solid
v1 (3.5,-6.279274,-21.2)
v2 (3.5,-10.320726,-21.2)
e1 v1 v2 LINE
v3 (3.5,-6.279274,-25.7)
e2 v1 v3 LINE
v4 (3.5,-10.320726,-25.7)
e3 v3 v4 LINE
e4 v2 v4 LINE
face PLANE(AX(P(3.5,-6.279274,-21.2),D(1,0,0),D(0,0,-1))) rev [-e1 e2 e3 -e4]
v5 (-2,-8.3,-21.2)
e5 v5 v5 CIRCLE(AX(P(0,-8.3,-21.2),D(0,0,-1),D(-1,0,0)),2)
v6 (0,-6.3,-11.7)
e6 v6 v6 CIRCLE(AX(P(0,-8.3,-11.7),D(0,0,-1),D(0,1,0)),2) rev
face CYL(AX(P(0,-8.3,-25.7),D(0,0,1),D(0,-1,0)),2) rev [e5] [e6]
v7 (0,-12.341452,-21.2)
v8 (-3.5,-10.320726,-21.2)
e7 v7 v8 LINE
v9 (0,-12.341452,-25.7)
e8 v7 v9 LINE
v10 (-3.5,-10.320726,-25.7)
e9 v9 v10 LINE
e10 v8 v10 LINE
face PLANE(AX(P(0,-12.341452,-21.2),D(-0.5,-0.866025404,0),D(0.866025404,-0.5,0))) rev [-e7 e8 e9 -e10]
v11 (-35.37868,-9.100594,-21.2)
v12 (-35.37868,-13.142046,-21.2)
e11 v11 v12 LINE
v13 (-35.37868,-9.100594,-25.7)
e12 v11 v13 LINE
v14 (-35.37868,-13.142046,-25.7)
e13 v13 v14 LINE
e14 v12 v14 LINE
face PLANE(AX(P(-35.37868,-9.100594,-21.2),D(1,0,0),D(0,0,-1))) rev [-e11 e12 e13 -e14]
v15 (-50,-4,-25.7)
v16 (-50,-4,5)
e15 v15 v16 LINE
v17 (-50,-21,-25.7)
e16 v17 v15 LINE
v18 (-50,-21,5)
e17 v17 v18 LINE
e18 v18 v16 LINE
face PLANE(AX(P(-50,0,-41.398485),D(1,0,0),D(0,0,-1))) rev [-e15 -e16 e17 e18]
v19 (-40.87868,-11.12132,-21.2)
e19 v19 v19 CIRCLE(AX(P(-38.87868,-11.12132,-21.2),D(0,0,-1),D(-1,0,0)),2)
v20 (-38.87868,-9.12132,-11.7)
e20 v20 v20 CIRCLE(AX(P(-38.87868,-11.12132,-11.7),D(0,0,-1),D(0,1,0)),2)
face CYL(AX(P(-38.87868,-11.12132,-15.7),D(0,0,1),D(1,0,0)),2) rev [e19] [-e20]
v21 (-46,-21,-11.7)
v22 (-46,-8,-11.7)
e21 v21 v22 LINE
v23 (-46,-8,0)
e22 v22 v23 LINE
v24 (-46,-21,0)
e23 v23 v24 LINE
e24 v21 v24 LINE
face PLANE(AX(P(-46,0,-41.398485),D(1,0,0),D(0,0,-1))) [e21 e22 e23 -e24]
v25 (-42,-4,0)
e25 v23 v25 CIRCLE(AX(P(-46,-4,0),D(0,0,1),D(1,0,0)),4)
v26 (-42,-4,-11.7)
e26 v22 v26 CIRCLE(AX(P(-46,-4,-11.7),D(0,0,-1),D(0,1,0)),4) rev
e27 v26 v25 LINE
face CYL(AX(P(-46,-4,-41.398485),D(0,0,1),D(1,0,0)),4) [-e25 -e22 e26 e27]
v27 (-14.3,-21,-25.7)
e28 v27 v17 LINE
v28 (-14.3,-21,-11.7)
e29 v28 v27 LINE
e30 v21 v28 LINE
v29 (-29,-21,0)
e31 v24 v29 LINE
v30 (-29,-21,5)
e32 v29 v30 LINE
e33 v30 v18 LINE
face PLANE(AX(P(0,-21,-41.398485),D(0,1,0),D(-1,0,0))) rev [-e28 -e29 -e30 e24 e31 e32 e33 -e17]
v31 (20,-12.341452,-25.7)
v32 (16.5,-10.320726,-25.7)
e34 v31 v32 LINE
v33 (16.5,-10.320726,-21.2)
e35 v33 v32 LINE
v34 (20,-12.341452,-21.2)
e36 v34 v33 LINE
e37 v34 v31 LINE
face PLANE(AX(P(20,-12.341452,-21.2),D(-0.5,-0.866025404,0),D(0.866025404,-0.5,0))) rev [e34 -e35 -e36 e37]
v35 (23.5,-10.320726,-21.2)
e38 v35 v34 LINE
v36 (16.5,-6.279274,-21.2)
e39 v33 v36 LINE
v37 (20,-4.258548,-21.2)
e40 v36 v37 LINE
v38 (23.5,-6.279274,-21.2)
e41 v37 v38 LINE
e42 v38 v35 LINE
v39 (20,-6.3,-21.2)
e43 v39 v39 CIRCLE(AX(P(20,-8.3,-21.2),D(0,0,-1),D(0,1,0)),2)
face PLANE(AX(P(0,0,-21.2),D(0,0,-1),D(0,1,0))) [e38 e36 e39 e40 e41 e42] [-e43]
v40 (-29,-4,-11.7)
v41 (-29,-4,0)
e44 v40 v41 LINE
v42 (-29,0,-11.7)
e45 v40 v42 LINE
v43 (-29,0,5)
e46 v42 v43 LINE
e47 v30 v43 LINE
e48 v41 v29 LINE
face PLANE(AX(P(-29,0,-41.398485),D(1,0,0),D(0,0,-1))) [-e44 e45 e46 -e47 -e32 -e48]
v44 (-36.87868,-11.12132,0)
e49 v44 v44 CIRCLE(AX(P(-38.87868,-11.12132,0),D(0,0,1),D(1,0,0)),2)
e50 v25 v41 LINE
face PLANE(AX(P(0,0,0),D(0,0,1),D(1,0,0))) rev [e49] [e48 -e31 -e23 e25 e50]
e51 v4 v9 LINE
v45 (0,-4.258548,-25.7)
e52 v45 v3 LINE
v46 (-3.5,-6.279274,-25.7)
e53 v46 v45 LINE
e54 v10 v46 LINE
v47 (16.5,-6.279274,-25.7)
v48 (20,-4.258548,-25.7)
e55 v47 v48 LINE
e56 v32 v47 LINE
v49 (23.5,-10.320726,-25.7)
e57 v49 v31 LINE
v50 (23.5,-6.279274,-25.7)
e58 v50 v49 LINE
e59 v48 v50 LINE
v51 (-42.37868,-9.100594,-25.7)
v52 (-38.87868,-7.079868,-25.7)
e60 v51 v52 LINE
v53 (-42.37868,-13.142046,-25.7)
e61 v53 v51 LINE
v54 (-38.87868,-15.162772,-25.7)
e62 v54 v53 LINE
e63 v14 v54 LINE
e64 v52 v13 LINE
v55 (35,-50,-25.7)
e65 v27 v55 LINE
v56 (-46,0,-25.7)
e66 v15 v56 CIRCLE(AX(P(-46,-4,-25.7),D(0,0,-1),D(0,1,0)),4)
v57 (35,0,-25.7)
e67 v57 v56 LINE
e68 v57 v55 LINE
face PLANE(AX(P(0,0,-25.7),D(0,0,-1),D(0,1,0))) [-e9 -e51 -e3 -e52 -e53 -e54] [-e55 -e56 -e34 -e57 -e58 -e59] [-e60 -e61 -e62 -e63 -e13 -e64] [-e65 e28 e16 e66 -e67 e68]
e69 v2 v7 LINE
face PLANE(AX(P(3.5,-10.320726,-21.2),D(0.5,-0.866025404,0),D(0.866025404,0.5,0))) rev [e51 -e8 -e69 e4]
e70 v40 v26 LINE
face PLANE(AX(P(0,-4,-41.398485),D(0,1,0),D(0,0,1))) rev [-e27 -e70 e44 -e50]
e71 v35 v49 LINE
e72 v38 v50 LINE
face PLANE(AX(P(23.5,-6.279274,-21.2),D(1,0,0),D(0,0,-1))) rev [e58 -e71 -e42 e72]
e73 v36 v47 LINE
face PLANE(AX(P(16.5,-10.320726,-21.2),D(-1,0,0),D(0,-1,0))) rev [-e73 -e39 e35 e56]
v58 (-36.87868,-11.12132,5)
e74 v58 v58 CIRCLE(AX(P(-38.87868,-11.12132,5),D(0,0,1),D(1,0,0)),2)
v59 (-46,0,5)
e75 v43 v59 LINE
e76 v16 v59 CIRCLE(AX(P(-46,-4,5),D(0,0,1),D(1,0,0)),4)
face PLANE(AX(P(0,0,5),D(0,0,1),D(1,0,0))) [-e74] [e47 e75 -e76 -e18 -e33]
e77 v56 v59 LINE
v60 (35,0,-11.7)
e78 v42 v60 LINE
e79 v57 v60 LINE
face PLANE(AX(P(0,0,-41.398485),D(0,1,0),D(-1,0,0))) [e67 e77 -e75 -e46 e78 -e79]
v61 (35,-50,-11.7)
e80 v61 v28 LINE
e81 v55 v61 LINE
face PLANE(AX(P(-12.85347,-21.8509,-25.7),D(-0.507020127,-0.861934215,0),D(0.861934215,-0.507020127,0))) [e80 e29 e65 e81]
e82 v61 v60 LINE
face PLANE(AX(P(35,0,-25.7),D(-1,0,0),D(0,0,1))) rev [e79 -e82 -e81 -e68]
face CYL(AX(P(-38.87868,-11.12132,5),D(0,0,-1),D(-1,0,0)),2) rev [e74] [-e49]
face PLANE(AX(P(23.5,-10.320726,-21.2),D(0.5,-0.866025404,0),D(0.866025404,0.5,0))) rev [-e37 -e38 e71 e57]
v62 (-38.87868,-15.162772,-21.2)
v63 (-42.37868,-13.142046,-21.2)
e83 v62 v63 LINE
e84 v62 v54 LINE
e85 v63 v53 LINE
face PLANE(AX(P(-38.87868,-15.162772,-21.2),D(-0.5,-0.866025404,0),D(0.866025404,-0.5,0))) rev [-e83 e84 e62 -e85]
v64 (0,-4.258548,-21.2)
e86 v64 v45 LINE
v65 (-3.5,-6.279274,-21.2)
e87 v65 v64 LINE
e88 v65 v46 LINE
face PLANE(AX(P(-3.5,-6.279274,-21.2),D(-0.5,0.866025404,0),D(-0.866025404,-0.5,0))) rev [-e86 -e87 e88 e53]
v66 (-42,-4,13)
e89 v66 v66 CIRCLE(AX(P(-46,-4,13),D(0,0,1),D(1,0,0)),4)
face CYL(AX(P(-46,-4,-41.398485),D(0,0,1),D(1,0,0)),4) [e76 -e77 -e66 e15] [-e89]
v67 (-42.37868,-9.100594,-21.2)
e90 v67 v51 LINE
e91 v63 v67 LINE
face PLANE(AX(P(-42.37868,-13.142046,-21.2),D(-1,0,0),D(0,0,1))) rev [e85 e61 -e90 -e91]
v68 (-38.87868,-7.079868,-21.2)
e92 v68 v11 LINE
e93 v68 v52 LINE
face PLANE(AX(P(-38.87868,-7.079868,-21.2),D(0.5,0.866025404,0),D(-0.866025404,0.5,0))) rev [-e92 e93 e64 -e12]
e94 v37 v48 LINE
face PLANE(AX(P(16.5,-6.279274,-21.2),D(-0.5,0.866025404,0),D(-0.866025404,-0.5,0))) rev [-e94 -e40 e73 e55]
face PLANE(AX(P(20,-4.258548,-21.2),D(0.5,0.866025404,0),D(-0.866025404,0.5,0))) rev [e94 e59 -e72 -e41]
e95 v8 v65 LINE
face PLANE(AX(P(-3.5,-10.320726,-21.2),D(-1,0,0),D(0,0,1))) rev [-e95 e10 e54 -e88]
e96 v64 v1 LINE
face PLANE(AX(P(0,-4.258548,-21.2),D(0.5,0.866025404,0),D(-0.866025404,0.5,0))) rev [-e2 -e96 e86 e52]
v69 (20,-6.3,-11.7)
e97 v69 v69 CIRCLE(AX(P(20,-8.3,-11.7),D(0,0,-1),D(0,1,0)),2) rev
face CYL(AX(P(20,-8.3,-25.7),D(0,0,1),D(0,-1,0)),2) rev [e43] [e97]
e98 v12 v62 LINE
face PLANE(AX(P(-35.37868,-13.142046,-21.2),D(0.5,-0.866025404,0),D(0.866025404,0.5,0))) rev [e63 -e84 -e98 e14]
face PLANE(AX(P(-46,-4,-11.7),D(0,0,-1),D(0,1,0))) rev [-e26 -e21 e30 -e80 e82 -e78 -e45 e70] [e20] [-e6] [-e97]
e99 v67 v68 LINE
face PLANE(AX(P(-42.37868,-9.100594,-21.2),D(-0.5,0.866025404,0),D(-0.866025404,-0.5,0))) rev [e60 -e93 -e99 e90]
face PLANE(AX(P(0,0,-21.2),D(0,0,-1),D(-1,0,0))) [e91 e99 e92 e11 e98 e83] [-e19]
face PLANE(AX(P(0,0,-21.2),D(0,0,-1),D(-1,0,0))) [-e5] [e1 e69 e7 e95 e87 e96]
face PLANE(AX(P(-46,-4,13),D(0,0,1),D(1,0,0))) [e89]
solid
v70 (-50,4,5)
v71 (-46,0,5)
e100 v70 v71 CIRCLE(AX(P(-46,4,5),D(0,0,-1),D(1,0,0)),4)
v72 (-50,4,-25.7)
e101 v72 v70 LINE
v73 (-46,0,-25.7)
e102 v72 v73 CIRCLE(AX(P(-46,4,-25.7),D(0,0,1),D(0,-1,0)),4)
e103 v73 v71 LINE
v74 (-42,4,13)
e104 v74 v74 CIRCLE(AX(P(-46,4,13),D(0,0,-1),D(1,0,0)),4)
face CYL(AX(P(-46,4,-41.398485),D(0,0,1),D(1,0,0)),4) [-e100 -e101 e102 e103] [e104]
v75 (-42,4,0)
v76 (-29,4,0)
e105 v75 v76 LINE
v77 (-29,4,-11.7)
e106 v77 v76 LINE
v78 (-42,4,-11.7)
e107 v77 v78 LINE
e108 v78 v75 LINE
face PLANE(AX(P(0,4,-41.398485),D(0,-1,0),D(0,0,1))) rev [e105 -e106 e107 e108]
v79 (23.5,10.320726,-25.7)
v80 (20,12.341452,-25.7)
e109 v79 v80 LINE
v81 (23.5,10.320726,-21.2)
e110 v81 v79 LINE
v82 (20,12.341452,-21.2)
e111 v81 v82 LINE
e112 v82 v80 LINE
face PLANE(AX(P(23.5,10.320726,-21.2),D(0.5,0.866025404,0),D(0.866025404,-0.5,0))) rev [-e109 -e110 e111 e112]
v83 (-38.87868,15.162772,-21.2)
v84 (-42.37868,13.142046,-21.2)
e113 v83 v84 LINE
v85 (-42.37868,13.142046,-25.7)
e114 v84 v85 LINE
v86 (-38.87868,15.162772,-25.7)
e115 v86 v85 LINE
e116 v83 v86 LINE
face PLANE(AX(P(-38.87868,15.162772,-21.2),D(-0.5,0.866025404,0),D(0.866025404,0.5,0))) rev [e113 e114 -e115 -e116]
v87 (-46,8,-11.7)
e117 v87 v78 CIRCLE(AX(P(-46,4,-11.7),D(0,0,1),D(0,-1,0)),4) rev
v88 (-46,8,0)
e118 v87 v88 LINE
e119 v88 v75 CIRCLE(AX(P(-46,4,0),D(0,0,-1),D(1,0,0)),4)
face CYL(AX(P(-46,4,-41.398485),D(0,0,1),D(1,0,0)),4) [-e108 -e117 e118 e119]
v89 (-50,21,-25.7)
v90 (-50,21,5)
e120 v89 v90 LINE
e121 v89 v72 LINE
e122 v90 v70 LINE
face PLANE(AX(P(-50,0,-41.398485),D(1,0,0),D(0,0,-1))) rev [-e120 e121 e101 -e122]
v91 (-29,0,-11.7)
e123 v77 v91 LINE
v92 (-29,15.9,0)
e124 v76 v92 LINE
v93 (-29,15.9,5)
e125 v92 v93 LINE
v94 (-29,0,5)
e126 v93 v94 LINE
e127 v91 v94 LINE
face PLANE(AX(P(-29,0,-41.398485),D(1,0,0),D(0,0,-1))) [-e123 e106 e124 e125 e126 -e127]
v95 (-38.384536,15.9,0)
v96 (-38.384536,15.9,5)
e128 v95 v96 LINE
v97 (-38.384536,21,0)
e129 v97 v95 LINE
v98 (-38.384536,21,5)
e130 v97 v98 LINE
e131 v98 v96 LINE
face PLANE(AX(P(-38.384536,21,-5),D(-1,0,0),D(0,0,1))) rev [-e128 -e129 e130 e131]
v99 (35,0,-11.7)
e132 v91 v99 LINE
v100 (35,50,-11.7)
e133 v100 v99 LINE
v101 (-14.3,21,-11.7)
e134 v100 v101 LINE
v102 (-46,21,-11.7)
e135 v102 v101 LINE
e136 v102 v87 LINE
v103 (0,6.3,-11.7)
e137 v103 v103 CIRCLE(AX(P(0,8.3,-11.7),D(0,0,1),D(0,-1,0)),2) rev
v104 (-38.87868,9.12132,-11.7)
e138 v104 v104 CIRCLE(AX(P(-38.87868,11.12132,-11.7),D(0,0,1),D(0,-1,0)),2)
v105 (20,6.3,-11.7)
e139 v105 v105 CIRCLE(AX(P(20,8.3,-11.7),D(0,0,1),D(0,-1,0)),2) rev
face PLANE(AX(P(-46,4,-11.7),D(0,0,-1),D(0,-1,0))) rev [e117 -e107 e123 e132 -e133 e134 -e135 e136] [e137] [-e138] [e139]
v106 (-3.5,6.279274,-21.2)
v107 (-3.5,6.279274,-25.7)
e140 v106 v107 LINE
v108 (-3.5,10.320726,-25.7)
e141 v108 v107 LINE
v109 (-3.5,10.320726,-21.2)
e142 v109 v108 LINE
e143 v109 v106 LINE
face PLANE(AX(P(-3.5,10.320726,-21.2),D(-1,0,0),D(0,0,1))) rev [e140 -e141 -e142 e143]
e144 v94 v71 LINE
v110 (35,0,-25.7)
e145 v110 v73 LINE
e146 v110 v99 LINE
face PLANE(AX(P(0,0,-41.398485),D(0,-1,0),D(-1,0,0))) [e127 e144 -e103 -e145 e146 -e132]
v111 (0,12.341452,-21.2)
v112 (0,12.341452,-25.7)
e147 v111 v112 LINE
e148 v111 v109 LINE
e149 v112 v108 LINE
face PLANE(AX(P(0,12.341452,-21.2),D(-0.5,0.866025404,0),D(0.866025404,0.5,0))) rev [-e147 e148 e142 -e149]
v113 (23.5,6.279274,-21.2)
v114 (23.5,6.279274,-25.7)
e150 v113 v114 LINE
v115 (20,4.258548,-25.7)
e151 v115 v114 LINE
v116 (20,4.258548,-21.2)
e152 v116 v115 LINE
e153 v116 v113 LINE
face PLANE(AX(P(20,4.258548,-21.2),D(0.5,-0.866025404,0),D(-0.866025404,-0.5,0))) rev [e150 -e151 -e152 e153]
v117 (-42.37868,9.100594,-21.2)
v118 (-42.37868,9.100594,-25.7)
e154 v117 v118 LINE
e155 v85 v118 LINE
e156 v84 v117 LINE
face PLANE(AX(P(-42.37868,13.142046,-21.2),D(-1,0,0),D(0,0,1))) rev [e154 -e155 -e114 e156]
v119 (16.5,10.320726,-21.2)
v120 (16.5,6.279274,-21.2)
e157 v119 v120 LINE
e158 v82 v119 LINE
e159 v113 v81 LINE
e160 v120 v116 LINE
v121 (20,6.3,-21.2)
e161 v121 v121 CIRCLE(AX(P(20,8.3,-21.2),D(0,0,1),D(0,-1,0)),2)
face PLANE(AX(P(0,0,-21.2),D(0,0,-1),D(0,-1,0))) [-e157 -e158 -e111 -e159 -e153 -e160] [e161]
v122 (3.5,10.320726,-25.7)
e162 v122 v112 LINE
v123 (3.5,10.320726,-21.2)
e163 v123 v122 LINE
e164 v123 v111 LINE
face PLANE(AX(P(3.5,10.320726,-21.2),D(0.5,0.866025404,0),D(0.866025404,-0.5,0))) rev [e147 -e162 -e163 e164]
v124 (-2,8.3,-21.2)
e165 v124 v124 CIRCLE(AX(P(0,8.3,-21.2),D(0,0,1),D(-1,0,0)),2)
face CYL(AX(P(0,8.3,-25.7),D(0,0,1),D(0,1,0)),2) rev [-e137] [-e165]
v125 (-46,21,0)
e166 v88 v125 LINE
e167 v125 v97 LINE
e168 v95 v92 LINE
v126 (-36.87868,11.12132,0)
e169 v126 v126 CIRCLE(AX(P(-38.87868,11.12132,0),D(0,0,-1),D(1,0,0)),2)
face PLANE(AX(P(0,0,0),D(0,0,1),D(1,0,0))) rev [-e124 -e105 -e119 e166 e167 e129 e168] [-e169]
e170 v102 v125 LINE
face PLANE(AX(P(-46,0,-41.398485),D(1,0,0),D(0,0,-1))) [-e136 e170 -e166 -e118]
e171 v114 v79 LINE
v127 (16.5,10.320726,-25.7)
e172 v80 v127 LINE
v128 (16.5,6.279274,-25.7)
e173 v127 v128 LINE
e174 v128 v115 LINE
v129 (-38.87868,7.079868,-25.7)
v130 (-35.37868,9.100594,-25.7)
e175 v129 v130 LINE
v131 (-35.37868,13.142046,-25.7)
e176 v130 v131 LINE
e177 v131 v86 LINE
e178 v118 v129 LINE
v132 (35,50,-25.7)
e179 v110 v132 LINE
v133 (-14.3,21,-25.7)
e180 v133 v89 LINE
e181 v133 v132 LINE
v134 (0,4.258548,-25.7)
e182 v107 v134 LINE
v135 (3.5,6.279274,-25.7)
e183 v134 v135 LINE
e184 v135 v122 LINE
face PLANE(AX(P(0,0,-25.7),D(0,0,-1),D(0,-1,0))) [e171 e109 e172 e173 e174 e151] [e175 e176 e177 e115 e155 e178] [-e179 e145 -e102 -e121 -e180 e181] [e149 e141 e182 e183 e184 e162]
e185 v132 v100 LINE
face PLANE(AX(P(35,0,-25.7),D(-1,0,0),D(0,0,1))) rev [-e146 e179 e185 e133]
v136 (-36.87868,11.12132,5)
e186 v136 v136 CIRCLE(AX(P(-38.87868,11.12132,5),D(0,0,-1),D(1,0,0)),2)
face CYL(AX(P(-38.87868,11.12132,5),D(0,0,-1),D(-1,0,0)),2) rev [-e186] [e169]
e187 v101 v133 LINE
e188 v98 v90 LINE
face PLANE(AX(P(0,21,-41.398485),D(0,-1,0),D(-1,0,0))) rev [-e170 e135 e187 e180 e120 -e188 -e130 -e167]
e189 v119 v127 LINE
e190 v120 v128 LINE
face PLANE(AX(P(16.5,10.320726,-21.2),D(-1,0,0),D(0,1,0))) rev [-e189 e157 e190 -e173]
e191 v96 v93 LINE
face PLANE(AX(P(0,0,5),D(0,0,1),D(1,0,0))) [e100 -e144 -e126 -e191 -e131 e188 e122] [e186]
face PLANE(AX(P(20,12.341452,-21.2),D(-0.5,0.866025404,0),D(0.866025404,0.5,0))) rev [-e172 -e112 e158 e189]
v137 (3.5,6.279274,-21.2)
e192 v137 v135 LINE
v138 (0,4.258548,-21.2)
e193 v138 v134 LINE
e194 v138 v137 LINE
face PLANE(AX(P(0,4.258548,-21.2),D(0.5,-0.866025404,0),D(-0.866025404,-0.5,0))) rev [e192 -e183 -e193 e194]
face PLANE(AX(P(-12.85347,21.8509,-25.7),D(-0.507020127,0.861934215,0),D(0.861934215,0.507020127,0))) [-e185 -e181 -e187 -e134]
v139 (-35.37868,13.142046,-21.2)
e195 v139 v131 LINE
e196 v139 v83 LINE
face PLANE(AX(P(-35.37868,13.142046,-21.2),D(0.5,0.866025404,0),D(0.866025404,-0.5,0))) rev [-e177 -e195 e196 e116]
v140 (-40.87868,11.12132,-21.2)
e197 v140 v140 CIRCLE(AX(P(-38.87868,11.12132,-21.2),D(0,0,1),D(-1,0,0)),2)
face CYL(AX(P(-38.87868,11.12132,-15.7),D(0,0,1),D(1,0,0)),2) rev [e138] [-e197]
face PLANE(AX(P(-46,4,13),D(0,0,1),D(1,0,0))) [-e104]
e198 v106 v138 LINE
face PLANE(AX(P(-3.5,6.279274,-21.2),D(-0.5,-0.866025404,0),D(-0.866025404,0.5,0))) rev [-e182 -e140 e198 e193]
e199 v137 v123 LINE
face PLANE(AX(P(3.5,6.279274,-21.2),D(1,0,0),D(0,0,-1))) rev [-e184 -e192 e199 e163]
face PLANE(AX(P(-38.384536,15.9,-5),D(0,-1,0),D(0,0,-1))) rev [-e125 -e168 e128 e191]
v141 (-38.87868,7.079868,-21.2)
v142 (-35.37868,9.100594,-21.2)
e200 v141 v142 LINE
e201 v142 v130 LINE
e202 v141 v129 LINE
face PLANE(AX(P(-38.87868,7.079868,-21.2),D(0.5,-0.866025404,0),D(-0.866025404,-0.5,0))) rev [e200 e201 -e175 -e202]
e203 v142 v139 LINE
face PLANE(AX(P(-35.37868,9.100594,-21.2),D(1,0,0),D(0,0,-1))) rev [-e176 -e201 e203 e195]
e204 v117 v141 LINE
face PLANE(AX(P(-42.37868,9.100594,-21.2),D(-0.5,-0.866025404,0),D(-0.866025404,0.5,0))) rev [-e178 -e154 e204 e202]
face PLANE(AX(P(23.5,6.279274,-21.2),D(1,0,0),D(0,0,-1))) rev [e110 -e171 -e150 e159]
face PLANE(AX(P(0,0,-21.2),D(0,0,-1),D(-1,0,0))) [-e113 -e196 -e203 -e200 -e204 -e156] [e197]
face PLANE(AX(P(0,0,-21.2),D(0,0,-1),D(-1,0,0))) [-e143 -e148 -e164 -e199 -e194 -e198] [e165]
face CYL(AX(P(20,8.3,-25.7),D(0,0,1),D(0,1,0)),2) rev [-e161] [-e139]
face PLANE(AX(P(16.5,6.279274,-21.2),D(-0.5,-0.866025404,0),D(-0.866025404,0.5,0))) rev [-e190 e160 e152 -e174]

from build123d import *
from build123d.topology import SkipClean

# Parameters (mm, degrees)
BOSS_EXTRUDE1_DEPTH     = 11.7
BOSS_EXTRUDE4_START     = 8
SKETCH1_6_R             = 4
BOSS_EXTRUDE4_DEPTH     = 8
BOSS_EXTRUDE5_START     = -11.7
SKETCH1_7_R             = 2
BOSS_EXTRUDE5_DEPTH     = 4
BOSS_EXTRUDE6_START     = 5
SKETCH1_8_R             = 2
BOSS_EXTRUDE6_DEPTH     = 5
BOSS_EXTRUDE7_START     = 8
BOSS_EXTRUDE7_OUTLINE_R = 4
BOSS_EXTRUDE7_DEPTH     = 5
SKETCH2_W               = 7
SKETCH2_H               = 10
SKETCH2_H_2             = 7
SKETCH2_W_2             = 10
BOSS_EXTRUDE8_DEPTH     = 5
BOSS_EXTRUDE9_START     = -20.7
SKETCH2_3_W             = 7
SKETCH2_3_H             = 10
SKETCH2_3_W_2           = 10
SKETCH2_3_H_2           = 7
BOSS_EXTRUDE9_DEPTH     = 4
SKETCH4_R               = 2
BOSS_EXTRUDE11_DEPTH    = 10
BOSS_EXTRUDE12_START    = -4
SKETCH4_3_R             = 2
BOSS_EXTRUDE12_DEPTH    = 4
SKETCH4_4_R             = 2
BOSS_EXTRUDE13_DEPTH    = 10
CUT_EXTRUDE1_DEPTH      = 4.5
SKETCH6_W               = 9.384536498
SKETCH6_H               = 5.1
CUT_EXTRUDE2_DEPTH      = 10


# Read off the part's stored shape, not the designer's step: Boss-Extrude7
with BuildPart() as part:
    # Sketch1 → Boss-Extrude1 (new body)
    with BuildSketch(Plane.XY):
        with BuildLine():
            Line((-36, -4), (-29, -4))
            Line((-29, -4), (-29, 0))
            Line((-29, 0), (-46, 0))
            ThreePointArc((-46, 0), (-43.171572875, -1.171572875), (-42, -4))
            Line((-42, -4), (-36, -4))
        make_face()
        with BuildLine():
            ThreePointArc((-46, -8), (-43.171572875, -6.828427125), (-42, -4))
            Line((-42, -4), (-46, -4))
            Line((-46, -4), (-46, -8))
        make_face()
        with BuildLine():
            Line((-46, -4), (-42, -4))
            ThreePointArc((-42, -4), (-43.171572875, -1.171572875), (-46, 0))
            Line((-46, 0), (-46, -4))
        make_face()
        with BuildLine():
            Line((-46, -4), (-46, 0))
            ThreePointArc((-46, 0), (-48.828427125, -1.171572875), (-50, -4))
            Line((-50, -4), (-46, -4))
        make_face()
        with BuildLine():
            Line((-46, -8), (-46, -4))
            Line((-46, -4), (-50, -4))
            ThreePointArc((-50, -4), (-48.828427125, -6.828427125), (-46, -8))
        make_face()
        with BuildLine():
            Line((-46, -14), (-46, -8))
            ThreePointArc((-46, -8), (-48.828427125, -6.828427125), (-50, -4))
            Line((-50, -4), (-50, -21))
            Line((-50, -21), (-46, -21))
            Line((-46, -21), (-46, -14))
        make_face()
    extrude(amount=-BOSS_EXTRUDE1_DEPTH)

    # Sketch1<6> → Boss-Extrude4 (add)
    with BuildSketch(Plane.XY.offset(BOSS_EXTRUDE4_START)):
        with Locations((-46, -4)):
            Circle(SKETCH1_6_R)
    extrude(amount=-BOSS_EXTRUDE4_DEPTH)

    # Sketch1<7> → Boss-Extrude5 (add)
    with SkipClean():  # the faces are left unmerged after this step: merging them gives an invalid solid
        with BuildSketch(Plane.XY.offset(BOSS_EXTRUDE5_START)):
            with BuildLine():
                Line((-36, -4), (-29, -4))
                Line((-29, -4), (-29, 0))
                Line((-29, 0), (-46, 0))
                ThreePointArc((-46, 0), (-48.828427125, -1.171572875), (-50, -4))
                Line((-50, -4), (-50, -21))
                Line((-50, -21), (-46, -21))
                Line((-46, -21), (-46, -14))
                Line((-46, -14), (-36, -14))
                Line((-36, -14), (-36, -4))
            make_face()
            with Locations((-38.878679656, -11.121320344)):
                Circle(SKETCH1_7_R, mode=Mode.SUBTRACT)
        extrude(amount=-BOSS_EXTRUDE5_DEPTH)

    # Sketch1<8> → Boss-Extrude6 (add)
    # profile 1 of 3: a face of its own
    with BuildSketch(Plane.XY.offset(BOSS_EXTRUDE6_START)):
        with BuildLine():
            Line((-46, -14), (-46, -8))
            ThreePointArc((-46, -8), (-48.828427125, -6.828427125), (-50, -4))
            Line((-50, -4), (-50, -21))
            Line((-50, -21), (-46, -21))
            Line((-46, -21), (-46, -14))
        make_face()
    # profile 2 of 3: a face of its own
    with BuildSketch(Plane.XY.offset(BOSS_EXTRUDE6_START)):
        with BuildLine():
            Line((-36, -14), (-36, -4))
            Line((-36, -4), (-42, -4))
            ThreePointArc((-42, -4), (-43.171572875, -6.828427125), (-46, -8))
            Line((-46, -8), (-46, -14))
            Line((-46, -14), (-36, -14))
        make_face()
        with Locations((-38.878679656, -11.121320344)):
            Circle(SKETCH1_8_R, mode=Mode.SUBTRACT)
    # profile 3 of 3: a face of its own
    with BuildSketch(Plane.XY.offset(BOSS_EXTRUDE6_START)):
        with BuildLine():
            Line((-36, -4), (-29, -4))
            Line((-29, -4), (-29, 0))
            Line((-29, 0), (-46, 0))
            ThreePointArc((-46, 0), (-43.171572875, -1.171572875), (-42, -4))
            Line((-42, -4), (-36, -4))
        make_face()
    extrude(amount=-BOSS_EXTRUDE6_DEPTH)

    # Boss-Extrude7 outline → Boss-Extrude7 (add)
    with BuildSketch(Plane.XY.offset(BOSS_EXTRUDE7_START)):
        with Locations((-46, -4)):
            Circle(BOSS_EXTRUDE7_OUTLINE_R)
    extrude(amount=BOSS_EXTRUDE7_DEPTH)

    # Sketch2 → Boss-Extrude8 (add)
    with BuildSketch(Plane.XY.offset(5)):
        with Locations((-32.5, -9)):
            Rectangle(SKETCH2_W, SKETCH2_H)
        with Locations((-32.5, -17.5)):
            Rectangle(SKETCH2_W, SKETCH2_H_2)
        with Locations((-41, -17.5)):
            Rectangle(SKETCH2_W_2, SKETCH2_H_2)
    extrude(amount=-BOSS_EXTRUDE8_DEPTH)

    # Sketch2<3> → Boss-Extrude9 (add)
    with BuildSketch(Plane.XY.offset(5).offset(BOSS_EXTRUDE9_START)):
        with Locations((-32.5, -9)):
            Rectangle(SKETCH2_3_W, SKETCH2_3_H)
        with Locations((-41, -17.5)):
            Rectangle(SKETCH2_3_W_2, SKETCH2_3_H_2)
        with Locations((-32.5, -17.5)):
            Rectangle(SKETCH2_3_W, SKETCH2_3_H_2)
    extrude(amount=BOSS_EXTRUDE9_DEPTH)

    # Sketch4 → Boss-Extrude11 (add)
    with SkipClean():  # the faces are left unmerged after this step: merging them gives an invalid solid
        with BuildSketch(Plane(origin=(0, 0, -15.7), x_dir=(-1, 0, 0), z_dir=(0, 0, -1))):
            with BuildLine():
                Line((46, 0), (-35, 0))
                Line((-35, 0), (-35, -50))
                Line((-35, -50), (14.3, -21))
                Line((14.3, -21), (48.503491121, -0.88029934))
                ThreePointArc((48.503491121, -0.88029934), (47.326875533, -0.226486873), (46, 0))
            make_face()
            with Locations(Location((-20, -8.3, 0), (0, 0, 90))):
                Circle(SKETCH4_R, mode=Mode.SUBTRACT)
            with Locations(Location((0, -8.3, 0), (0, 0, 90))):
                Circle(SKETCH4_R, mode=Mode.SUBTRACT)
        extrude(amount=BOSS_EXTRUDE11_DEPTH)

    # Sketch4<3> → Boss-Extrude12 (add)
    with SkipClean():  # the faces are left unmerged after this step: merging them gives an invalid solid
        with BuildSketch(Plane(origin=(0, 0, -15.7), x_dir=(-1, 0, 0), z_dir=(0, 0, -1)).offset(BOSS_EXTRUDE12_START)):
            Polygon((29, 0), (-35, 0), (-35, -50), (14.3, -21), (29, -21), align=None)
            with Locations(Location((-20, -8.3, 0), (0, 0, 90))):
                Circle(SKETCH4_3_R, mode=Mode.SUBTRACT)
            with Locations(Location((0, -8.3, 0), (0, 0, 90))):
                Circle(SKETCH4_3_R, mode=Mode.SUBTRACT)
        extrude(amount=BOSS_EXTRUDE12_DEPTH)

    # Sketch4<4> → Boss-Extrude13 (add)
    # profile 1 of 2: a face of its own
    with SkipClean():  # the faces are left unmerged after this step: merging them gives an invalid solid
        with BuildSketch(Plane(origin=(0, 0, -15.7), x_dir=(-1, 0, 0), z_dir=(0, 0, -1))):
            with BuildLine():
                Line((48.503491121, -0.88029934), (29, -12.352941176))
                Line((29, -12.352941176), (29, -21))
                Line((29, -21), (50, -21))
                Line((50, -21), (50, -4))
                ThreePointArc((50, -4), (49.606519408, -2.269965966), (48.503491121, -0.88029934))
            make_face()
            with Locations(Location((38.878679656, -11.121320344, 0), (0, 0, 90))):
                Circle(SKETCH4_4_R, mode=Mode.SUBTRACT)
        # profile 2 of 2: a face of its own
        with BuildSketch(Plane(origin=(0, 0, -15.7), x_dir=(-1, 0, 0), z_dir=(0, 0, -1))):
            Polygon((29, -21), (29, -12.352941176), (14.3, -21), align=None)
        extrude(amount=BOSS_EXTRUDE13_DEPTH)
    add(part.part.scale(1), mode=Mode.REPLACE)  # the faces are merged on a copy

    # Sketch5 → Cut-Extrude1 (cut)
    with BuildSketch(Plane(origin=(0, 0, -25.7), x_dir=(-1, 0, 0), z_dir=(0, 0, -1))):
        Polygon((35.378679656, -9.100594401), (35.378679656, -13.142046286), (38.878679656, -15.162772228), (42.378679656, -13.142046286), (42.378679656, -9.100594401), (38.878679656, -7.079868459), align=None)
        Polygon((-3.5, -6.279274058), (-3.5, -10.320725942), (0, -12.341451884), (3.5, -10.320725942), (3.5, -6.279274058), (0, -4.258548116), align=None)
        Polygon((-16.5, -10.320725942), (-16.5, -6.279274058), (-20, -4.258548116), (-23.5, -6.279274058), (-23.5, -10.320725942), (-20, -12.341451884), align=None)
    extrude(amount=-CUT_EXTRUDE1_DEPTH, mode=Mode.SUBTRACT)


with BuildPart() as body_2:
    # Mirror2: mirrored copy
    add(part.part.mirror(Plane.ZX))

    # Sketch6 → Cut-Extrude2 (cut)
    with SkipClean():  # the faces are left unmerged after this step: merging them gives an invalid solid
        with BuildSketch(Plane.XY.offset(5)):
            with Locations((-33.692268249, 18.45)):
                Rectangle(SKETCH6_W, SKETCH6_H)
        extrude(amount=-CUT_EXTRUDE2_DEPTH, mode=Mode.SUBTRACT)


solid = Compound([part.part, body_2.part])
